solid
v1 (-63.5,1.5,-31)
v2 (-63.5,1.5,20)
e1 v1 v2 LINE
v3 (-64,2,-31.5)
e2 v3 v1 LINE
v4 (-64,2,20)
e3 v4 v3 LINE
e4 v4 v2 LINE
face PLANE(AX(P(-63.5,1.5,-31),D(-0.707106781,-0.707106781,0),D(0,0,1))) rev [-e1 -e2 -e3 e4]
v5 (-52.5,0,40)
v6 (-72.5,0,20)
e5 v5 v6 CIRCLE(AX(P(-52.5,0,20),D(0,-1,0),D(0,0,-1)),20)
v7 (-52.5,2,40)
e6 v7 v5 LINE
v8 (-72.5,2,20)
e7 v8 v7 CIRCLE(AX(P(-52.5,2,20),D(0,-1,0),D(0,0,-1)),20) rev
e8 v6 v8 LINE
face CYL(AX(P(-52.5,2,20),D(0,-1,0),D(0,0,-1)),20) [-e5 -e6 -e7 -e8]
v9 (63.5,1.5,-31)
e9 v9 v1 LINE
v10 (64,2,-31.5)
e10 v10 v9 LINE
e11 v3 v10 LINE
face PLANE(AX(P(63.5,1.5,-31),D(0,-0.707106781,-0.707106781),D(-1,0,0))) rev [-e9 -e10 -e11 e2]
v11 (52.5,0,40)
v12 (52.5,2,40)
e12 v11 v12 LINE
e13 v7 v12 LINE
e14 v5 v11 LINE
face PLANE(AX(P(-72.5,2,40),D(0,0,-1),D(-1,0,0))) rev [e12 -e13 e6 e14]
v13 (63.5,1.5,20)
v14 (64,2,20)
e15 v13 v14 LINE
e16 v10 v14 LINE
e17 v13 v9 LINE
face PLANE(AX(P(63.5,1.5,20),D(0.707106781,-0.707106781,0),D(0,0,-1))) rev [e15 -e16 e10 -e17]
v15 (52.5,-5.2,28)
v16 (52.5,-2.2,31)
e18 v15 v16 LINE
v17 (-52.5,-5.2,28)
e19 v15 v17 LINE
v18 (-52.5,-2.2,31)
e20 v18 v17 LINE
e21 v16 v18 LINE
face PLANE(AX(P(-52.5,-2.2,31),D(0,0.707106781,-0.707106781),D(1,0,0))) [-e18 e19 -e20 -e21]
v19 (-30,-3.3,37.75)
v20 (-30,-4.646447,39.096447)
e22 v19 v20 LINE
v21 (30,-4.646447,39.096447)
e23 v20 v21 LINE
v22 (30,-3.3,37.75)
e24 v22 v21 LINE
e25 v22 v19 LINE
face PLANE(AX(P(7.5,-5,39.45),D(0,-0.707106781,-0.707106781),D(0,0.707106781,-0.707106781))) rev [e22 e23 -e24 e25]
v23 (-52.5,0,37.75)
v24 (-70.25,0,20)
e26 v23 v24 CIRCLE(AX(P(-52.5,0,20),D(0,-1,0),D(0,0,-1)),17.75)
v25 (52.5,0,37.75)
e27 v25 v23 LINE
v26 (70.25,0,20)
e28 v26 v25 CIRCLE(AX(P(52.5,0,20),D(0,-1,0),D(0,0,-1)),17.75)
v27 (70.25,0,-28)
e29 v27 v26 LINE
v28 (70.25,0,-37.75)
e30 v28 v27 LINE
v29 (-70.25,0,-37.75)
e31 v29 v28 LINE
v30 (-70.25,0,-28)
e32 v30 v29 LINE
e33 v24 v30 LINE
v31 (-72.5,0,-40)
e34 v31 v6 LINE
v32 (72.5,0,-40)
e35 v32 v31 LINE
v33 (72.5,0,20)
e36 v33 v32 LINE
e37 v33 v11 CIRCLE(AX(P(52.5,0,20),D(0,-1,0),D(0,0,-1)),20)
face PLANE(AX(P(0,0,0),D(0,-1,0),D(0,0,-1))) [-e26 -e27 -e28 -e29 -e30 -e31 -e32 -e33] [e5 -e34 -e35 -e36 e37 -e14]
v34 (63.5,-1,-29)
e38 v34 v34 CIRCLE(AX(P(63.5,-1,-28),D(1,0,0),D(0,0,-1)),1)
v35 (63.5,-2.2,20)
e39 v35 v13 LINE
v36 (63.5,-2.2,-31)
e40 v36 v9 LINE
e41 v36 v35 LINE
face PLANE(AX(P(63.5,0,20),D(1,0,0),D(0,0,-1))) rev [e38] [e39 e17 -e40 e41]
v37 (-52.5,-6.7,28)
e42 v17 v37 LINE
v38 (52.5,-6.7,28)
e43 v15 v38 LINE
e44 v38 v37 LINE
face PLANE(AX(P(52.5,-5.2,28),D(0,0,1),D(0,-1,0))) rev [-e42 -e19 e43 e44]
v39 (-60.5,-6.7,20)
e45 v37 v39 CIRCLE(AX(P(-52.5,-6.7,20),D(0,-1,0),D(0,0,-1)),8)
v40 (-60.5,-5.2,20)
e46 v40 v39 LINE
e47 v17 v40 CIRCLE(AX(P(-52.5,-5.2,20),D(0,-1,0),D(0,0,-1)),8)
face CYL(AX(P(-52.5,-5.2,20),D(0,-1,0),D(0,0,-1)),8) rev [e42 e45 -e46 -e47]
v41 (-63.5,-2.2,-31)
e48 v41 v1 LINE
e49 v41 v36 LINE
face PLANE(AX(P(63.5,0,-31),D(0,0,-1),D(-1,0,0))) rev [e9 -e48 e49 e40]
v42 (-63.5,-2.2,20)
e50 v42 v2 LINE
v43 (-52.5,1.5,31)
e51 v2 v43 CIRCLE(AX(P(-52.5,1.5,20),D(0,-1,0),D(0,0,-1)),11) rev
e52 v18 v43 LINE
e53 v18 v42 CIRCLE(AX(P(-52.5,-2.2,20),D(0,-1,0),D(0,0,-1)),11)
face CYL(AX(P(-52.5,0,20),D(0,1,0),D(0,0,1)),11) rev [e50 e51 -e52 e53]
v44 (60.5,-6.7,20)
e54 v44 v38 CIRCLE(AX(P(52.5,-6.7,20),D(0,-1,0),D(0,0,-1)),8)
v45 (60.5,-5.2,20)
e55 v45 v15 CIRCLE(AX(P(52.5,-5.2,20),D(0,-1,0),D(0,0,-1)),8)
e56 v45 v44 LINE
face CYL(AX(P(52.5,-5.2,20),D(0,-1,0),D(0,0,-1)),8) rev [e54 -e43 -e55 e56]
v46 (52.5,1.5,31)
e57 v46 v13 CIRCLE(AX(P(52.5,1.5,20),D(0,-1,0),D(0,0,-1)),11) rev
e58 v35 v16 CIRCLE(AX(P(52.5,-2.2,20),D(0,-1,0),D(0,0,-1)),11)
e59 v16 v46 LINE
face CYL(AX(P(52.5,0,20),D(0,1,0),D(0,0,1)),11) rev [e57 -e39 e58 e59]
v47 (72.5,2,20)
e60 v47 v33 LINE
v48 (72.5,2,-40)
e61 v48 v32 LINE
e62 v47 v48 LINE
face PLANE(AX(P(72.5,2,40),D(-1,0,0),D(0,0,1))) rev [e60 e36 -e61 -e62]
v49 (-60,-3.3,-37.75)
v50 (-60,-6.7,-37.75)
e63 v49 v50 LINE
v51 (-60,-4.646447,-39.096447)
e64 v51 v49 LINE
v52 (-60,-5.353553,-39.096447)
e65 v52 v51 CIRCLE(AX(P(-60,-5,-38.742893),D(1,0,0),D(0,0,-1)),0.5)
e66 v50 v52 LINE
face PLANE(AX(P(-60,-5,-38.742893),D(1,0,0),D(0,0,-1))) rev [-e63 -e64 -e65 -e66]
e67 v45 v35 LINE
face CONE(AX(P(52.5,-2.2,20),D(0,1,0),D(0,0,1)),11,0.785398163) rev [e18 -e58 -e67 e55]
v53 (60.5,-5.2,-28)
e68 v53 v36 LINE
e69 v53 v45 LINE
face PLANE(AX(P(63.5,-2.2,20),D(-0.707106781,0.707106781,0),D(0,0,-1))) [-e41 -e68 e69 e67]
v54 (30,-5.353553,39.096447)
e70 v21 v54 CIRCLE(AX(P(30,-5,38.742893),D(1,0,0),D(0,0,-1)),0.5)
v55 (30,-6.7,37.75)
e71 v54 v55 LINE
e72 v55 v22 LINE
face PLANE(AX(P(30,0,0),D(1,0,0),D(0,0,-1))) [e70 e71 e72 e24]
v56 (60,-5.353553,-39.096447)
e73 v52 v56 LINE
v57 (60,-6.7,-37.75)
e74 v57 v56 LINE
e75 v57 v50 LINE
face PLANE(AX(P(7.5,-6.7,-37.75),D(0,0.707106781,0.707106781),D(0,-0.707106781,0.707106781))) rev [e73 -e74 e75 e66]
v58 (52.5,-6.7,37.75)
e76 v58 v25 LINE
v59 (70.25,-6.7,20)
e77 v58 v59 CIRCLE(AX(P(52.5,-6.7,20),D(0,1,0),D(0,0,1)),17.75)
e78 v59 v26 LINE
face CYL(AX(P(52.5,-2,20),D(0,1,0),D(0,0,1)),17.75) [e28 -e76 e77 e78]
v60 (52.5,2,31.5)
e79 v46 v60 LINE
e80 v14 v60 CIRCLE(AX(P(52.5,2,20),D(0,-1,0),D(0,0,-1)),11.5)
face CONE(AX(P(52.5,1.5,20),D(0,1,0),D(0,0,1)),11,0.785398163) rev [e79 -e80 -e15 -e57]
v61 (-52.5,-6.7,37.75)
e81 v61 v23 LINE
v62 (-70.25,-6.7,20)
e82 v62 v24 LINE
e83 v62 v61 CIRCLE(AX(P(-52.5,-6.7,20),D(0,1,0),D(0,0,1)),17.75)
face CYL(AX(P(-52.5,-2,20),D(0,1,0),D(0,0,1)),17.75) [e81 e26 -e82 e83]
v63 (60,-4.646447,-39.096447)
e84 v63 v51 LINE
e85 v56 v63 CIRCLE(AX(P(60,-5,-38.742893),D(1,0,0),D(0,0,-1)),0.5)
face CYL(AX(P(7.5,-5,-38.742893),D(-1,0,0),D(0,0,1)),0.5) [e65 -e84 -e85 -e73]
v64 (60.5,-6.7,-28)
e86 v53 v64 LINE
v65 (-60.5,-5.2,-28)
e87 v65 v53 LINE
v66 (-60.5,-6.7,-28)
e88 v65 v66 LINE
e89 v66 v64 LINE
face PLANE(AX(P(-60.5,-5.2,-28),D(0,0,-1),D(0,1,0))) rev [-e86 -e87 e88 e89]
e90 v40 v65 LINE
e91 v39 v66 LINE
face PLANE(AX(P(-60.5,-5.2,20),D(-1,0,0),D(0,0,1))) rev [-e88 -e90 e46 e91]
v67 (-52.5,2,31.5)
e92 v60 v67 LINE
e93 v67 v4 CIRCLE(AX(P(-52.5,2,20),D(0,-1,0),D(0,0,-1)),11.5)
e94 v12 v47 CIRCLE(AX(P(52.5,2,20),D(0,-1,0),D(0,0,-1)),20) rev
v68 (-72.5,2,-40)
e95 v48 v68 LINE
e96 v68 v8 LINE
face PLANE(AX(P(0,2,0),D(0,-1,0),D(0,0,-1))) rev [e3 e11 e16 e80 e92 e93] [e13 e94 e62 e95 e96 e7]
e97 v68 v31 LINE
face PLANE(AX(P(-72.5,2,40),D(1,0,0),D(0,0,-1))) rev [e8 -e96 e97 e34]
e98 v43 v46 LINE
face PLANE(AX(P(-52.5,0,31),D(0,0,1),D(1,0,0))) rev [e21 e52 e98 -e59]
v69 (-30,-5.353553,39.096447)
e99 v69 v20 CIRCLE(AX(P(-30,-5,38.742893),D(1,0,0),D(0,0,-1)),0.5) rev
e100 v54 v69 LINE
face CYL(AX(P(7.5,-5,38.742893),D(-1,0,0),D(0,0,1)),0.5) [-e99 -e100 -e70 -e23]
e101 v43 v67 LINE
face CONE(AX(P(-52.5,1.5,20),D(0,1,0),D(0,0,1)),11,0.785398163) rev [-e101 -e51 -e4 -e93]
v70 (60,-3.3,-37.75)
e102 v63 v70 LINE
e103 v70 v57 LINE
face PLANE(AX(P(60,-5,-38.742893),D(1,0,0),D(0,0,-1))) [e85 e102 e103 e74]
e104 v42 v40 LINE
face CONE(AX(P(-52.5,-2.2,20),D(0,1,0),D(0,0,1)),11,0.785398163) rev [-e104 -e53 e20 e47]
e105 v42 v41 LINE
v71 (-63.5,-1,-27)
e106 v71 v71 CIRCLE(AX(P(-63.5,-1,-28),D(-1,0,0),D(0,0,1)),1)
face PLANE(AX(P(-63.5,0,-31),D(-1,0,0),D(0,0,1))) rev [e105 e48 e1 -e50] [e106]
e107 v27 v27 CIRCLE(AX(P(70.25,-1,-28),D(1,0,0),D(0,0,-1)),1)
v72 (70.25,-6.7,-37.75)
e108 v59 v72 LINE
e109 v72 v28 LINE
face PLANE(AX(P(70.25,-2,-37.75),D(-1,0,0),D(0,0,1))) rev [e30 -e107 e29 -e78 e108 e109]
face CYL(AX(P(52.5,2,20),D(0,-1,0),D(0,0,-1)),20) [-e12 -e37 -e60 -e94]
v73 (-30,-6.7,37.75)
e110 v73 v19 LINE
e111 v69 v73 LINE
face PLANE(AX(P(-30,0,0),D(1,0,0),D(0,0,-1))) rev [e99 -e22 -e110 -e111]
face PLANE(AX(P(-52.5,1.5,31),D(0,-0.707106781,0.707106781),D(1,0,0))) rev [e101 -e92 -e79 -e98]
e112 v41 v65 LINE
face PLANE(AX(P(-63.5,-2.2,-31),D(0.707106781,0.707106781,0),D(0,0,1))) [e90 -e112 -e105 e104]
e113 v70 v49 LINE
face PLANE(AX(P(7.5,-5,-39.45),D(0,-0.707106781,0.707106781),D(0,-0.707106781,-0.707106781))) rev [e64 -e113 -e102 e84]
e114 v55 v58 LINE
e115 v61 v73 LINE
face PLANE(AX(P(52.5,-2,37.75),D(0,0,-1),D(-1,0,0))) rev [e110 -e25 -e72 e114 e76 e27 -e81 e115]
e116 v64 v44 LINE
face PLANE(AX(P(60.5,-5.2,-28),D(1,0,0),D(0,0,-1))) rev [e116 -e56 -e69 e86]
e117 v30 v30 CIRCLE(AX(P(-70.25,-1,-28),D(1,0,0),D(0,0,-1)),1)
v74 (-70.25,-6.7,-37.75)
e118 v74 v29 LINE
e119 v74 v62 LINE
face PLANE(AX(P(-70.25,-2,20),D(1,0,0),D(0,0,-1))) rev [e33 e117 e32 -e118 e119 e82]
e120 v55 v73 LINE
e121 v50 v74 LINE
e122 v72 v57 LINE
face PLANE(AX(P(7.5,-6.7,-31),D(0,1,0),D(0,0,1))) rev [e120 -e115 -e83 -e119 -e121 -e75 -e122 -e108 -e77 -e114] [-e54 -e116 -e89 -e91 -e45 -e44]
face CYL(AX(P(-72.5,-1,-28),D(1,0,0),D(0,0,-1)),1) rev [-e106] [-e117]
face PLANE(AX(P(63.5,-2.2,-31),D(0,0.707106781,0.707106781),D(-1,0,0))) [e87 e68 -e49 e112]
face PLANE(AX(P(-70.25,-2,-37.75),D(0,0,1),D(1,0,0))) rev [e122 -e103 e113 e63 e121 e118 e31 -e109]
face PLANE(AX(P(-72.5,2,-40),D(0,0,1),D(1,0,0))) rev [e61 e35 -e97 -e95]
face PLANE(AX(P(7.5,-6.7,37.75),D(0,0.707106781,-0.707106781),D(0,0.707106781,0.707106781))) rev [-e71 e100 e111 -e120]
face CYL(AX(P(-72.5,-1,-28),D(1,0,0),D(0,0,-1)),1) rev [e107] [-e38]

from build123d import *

# Parameters (mm, degrees)
SKETCH_1_W          = 145
SKETCH_1_H          = 80
EXTRUDE_1_DEPTH     = 2
FILLET_1_R          = 20
CUT_EXTRUDE_1_DEPTH = 2
EXTRUDE_2_DEPTH     = 2
EXTRUDE_4_DEPTH     = 7.5
EXTRUDE_5_DEPTH     = 30
FILLET_2_R          = 0.5
EXTRUDE_6_DEPTH     = 4.7
EXTRUDE_START       = -1.5
EXTRUDE_9_DEPTH     = 1.5
CHAMFER_2_SIZE      = 3
SKETCH_11_R         = 1
CUT_EXTRUDE_2_DEPTH = 149.399637803
CHAMFER_3_SIZE      = 0.5
EXTRUDE_10_DEPTH    = 60


with BuildPart() as part:
    # Эскиз1 → Бобышка-Вытянуть1 (new body)
    with BuildSketch(Plane(origin=(0, 0, 0), x_dir=(1, 0, 0), z_dir=(0, 1, 0))):
        Rectangle(SKETCH_1_W, SKETCH_1_H)
    extrude(amount=EXTRUDE_1_DEPTH)

    # Скругление1
    fillet_1_edges = [part.edges().sort_by_distance(p)[0] for p in [
        (72.5, 1, 40),
        (-72.5, 1, 40),
    ]]
    fillet(fillet_1_edges, radius=FILLET_1_R)

    # Эскиз2 → Вырез-Вытянуть1 (cut)
    with BuildSketch(Plane(origin=(0, 2, 0), x_dir=(1, 0, 0), z_dir=(0, 1, 0))):
        with BuildLine():
            Line((-63.5, 31), (-63.5, -20))
            ThreePointArc((-63.5, -20), (-60.278174593, -27.778174593), (-52.5, -31))
            Line((-52.5, -31), (52.5, -31))
            ThreePointArc((52.5, -31), (60.278174593, -27.778174593), (63.5, -20))
            Line((63.5, -20), (63.5, 31))
            Line((63.5, 31), (-63.5, 31))
        make_face()
    extrude(amount=-CUT_EXTRUDE_1_DEPTH, mode=Mode.SUBTRACT)

    # Эскиз3 → Бобышка-Вытянуть2 (add)
    with BuildSketch(Plane.XZ):
        with BuildLine():
            Line((70.25, -37.75), (70.25, 20))
            ThreePointArc((70.25, 20), (65.051145366, 32.551145366), (52.5, 37.75))
            Line((52.5, 37.75), (-52.5, 37.75))
            ThreePointArc((-52.5, 37.75), (-65.051145366, 32.551145366), (-70.25, 20))
            Line((-70.25, 20), (-70.25, -37.75))
            Line((-70.25, -37.75), (70.25, -37.75))
        make_face()
        with BuildLine():
            Line((-63.5, -31), (-63.5, 20))
            ThreePointArc((-63.5, 20), (-60.278174593, 27.778174593), (-52.5, 31))
            Line((-52.5, 31), (52.5, 31))
            ThreePointArc((52.5, 31), (60.278174593, 27.778174593), (63.5, 20))
            Line((63.5, 20), (63.5, -31))
            Line((63.5, -31), (-63.5, -31))
        make_face(mode=Mode.SUBTRACT)
    extrude(amount=EXTRUDE_2_DEPTH)

    # Эскиз5 → Бобышка-Вытянуть4 (add, symmetric)
    with BuildSketch(Plane(origin=(0, 0, 0), x_dir=(0, 0, -1), z_dir=(1, 0, 0))):
        Polygon((37.75, -2), (31, -2), (31, -6.7), (37.75, -6.7), (39.45, -5), (37.75, -3.3), align=None)
        Polygon((-31, -2), (-31, -6.7), (-37.75, -6.7), (-39.45, -5), (-37.75, -3.3), (-37.75, -2), align=None)
    extrude(amount=EXTRUDE_4_DEPTH, both=True)

    # Эскиз6 → Бобышка-Вытянуть5 (add, symmetric)
    with BuildSketch(Plane(origin=(0, 0, 0), x_dir=(0, 0, -1), z_dir=(1, 0, 0))):
        Polygon((-39.45, -5), (-37.75, -6.7), (-31, -6.7), (-31, -2), (-37.75, -2), (-37.75, -3.3), align=None)
    extrude(amount=EXTRUDE_5_DEPTH, both=True)

    # Скругление2
    fillet_2_edges = [part.edges().sort_by_distance(p)[0] for p in [
        (0, -5, 39.45),
        (0, -5, -39.45),
    ]]
    fillet(fillet_2_edges, radius=FILLET_2_R)

    # Эскиз7 → Бобышка-Вытянуть6 (add)
    with BuildSketch(Plane.XZ.offset(2)):
        with BuildLine():
            Line((-52.5, 31), (-30, 31))
            Line((-30, 31), (-30, 37.75))
            Line((-30, 37.75), (-52.5, 37.75))
            ThreePointArc((-52.5, 37.75), (-65.051145366, 32.551145366), (-70.25, 20))
            Line((-70.25, 20), (-70.25, -37.75))
            Line((-70.25, -37.75), (-7.5, -37.75))
            Line((-7.5, -37.75), (-7.5, -31))
            Line((-7.5, -31), (-63.5, -31))
            Line((-63.5, -31), (-63.5, 20))
            ThreePointArc((-63.5, 20), (-60.278174593, 27.778174593), (-52.5, 31))
        make_face()
        with BuildLine():
            Line((30, 31), (52.5, 31))
            ThreePointArc((52.5, 31), (60.278174593, 27.778174593), (63.5, 20))
            Line((63.5, 20), (63.5, -31))
            Line((63.5, -31), (7.5, -31))
            Line((7.5, -31), (7.5, -37.75))
            Line((7.5, -37.75), (70.25, -37.75))
            Line((70.25, -37.75), (70.25, 20))
            ThreePointArc((70.25, 20), (65.051145366, 32.551145366), (52.5, 37.75))
            Line((52.5, 37.75), (30, 37.75))
            Line((30, 37.75), (30, 31))
        make_face()
    extrude(amount=EXTRUDE_6_DEPTH)

    # Эскиз10 → Бобышка-Вытянуть9 (add)
    with BuildSketch(Plane.XZ.offset(6.7).offset(EXTRUDE_START)):
        with BuildLine():
            Line((-63.5, 20), (-63.5, -31))
            Line((-63.5, -31), (63.5, -31))
            Line((63.5, -31), (63.5, 20))
            ThreePointArc((63.5, 20), (60.278174593, 27.778174593), (52.5, 31))
            Line((52.5, 31), (-52.5, 31))
            ThreePointArc((-52.5, 31), (-60.278174593, 27.778174593), (-63.5, 20))
        make_face()
        with BuildLine():
            Line((60.5, -28), (60.5, 20))
            ThreePointArc((60.5, 20), (58.156854249, 25.656854249), (52.5, 28))
            Line((52.5, 28), (-52.5, 28))
            ThreePointArc((-52.5, 28), (-58.156854249, 25.656854249), (-60.5, 20))
            Line((-60.5, 20), (-60.5, -28))
            Line((-60.5, -28), (60.5, -28))
        make_face(mode=Mode.SUBTRACT)
    extrude(amount=EXTRUDE_9_DEPTH)

    # Фаска2
    chamfer_2_edges = [part.edges().sort_by_distance(p)[0] for p in [
        (-60.278174593, -5.2, 27.778174593),
        (0, -5.2, 31),
        (60.278174593, -5.2, 27.778174593),
        (63.5, -5.2, -5.5),
        (0, -5.2, -31),
        (-63.5, -5.2, -5.5),
    ]]
    chamfer(chamfer_2_edges, length=CHAMFER_2_SIZE - 0.0001)  # a hair under: the kernel refuses the full size

    # Эскиз11 → Вырез-Вытянуть2 (cut, through all)
    with BuildSketch(Plane(origin=(70.25, 0, 0), x_dir=(0, 0, -1), z_dir=(1, 0, 0))):
        with Locations((28, -1)):
            Circle(SKETCH_11_R)
    extrude(amount=-CUT_EXTRUDE_2_DEPTH, mode=Mode.SUBTRACT)

    # Фаска3
    chamfer_3_edges = [part.edges().sort_by_distance(p)[0] for p in [
        (0, 2, -31),
        (-63.5, 2, -5.5),
        (-60.278174593, 2, 27.778174593),
        (0, 2, 31),
        (60.278174593, 2, 27.778174593),
        (63.5, 2, -5.5),
    ]]
    chamfer(chamfer_3_edges, length=CHAMFER_3_SIZE)

    # Эскиз12 → Бобышка-Вытянуть10 (add, symmetric)
    with BuildSketch(Plane(origin=(0, 0, 0), x_dir=(0, 0, -1), z_dir=(1, 0, 0))):
        with BuildLine():
            Line((39.096446609, -4.646446609), (37.75, -3.3))
            Line((37.75, -3.3), (37.75, -6.7))
            Line((37.75, -6.7), (39.096446609, -5.353553391))
            ThreePointArc((39.096446609, -5.353553391), (39.242893219, -5), (39.096446609, -4.646446609))
        make_face()
    extrude(amount=EXTRUDE_10_DEPTH, both=True)


solid = part.part
